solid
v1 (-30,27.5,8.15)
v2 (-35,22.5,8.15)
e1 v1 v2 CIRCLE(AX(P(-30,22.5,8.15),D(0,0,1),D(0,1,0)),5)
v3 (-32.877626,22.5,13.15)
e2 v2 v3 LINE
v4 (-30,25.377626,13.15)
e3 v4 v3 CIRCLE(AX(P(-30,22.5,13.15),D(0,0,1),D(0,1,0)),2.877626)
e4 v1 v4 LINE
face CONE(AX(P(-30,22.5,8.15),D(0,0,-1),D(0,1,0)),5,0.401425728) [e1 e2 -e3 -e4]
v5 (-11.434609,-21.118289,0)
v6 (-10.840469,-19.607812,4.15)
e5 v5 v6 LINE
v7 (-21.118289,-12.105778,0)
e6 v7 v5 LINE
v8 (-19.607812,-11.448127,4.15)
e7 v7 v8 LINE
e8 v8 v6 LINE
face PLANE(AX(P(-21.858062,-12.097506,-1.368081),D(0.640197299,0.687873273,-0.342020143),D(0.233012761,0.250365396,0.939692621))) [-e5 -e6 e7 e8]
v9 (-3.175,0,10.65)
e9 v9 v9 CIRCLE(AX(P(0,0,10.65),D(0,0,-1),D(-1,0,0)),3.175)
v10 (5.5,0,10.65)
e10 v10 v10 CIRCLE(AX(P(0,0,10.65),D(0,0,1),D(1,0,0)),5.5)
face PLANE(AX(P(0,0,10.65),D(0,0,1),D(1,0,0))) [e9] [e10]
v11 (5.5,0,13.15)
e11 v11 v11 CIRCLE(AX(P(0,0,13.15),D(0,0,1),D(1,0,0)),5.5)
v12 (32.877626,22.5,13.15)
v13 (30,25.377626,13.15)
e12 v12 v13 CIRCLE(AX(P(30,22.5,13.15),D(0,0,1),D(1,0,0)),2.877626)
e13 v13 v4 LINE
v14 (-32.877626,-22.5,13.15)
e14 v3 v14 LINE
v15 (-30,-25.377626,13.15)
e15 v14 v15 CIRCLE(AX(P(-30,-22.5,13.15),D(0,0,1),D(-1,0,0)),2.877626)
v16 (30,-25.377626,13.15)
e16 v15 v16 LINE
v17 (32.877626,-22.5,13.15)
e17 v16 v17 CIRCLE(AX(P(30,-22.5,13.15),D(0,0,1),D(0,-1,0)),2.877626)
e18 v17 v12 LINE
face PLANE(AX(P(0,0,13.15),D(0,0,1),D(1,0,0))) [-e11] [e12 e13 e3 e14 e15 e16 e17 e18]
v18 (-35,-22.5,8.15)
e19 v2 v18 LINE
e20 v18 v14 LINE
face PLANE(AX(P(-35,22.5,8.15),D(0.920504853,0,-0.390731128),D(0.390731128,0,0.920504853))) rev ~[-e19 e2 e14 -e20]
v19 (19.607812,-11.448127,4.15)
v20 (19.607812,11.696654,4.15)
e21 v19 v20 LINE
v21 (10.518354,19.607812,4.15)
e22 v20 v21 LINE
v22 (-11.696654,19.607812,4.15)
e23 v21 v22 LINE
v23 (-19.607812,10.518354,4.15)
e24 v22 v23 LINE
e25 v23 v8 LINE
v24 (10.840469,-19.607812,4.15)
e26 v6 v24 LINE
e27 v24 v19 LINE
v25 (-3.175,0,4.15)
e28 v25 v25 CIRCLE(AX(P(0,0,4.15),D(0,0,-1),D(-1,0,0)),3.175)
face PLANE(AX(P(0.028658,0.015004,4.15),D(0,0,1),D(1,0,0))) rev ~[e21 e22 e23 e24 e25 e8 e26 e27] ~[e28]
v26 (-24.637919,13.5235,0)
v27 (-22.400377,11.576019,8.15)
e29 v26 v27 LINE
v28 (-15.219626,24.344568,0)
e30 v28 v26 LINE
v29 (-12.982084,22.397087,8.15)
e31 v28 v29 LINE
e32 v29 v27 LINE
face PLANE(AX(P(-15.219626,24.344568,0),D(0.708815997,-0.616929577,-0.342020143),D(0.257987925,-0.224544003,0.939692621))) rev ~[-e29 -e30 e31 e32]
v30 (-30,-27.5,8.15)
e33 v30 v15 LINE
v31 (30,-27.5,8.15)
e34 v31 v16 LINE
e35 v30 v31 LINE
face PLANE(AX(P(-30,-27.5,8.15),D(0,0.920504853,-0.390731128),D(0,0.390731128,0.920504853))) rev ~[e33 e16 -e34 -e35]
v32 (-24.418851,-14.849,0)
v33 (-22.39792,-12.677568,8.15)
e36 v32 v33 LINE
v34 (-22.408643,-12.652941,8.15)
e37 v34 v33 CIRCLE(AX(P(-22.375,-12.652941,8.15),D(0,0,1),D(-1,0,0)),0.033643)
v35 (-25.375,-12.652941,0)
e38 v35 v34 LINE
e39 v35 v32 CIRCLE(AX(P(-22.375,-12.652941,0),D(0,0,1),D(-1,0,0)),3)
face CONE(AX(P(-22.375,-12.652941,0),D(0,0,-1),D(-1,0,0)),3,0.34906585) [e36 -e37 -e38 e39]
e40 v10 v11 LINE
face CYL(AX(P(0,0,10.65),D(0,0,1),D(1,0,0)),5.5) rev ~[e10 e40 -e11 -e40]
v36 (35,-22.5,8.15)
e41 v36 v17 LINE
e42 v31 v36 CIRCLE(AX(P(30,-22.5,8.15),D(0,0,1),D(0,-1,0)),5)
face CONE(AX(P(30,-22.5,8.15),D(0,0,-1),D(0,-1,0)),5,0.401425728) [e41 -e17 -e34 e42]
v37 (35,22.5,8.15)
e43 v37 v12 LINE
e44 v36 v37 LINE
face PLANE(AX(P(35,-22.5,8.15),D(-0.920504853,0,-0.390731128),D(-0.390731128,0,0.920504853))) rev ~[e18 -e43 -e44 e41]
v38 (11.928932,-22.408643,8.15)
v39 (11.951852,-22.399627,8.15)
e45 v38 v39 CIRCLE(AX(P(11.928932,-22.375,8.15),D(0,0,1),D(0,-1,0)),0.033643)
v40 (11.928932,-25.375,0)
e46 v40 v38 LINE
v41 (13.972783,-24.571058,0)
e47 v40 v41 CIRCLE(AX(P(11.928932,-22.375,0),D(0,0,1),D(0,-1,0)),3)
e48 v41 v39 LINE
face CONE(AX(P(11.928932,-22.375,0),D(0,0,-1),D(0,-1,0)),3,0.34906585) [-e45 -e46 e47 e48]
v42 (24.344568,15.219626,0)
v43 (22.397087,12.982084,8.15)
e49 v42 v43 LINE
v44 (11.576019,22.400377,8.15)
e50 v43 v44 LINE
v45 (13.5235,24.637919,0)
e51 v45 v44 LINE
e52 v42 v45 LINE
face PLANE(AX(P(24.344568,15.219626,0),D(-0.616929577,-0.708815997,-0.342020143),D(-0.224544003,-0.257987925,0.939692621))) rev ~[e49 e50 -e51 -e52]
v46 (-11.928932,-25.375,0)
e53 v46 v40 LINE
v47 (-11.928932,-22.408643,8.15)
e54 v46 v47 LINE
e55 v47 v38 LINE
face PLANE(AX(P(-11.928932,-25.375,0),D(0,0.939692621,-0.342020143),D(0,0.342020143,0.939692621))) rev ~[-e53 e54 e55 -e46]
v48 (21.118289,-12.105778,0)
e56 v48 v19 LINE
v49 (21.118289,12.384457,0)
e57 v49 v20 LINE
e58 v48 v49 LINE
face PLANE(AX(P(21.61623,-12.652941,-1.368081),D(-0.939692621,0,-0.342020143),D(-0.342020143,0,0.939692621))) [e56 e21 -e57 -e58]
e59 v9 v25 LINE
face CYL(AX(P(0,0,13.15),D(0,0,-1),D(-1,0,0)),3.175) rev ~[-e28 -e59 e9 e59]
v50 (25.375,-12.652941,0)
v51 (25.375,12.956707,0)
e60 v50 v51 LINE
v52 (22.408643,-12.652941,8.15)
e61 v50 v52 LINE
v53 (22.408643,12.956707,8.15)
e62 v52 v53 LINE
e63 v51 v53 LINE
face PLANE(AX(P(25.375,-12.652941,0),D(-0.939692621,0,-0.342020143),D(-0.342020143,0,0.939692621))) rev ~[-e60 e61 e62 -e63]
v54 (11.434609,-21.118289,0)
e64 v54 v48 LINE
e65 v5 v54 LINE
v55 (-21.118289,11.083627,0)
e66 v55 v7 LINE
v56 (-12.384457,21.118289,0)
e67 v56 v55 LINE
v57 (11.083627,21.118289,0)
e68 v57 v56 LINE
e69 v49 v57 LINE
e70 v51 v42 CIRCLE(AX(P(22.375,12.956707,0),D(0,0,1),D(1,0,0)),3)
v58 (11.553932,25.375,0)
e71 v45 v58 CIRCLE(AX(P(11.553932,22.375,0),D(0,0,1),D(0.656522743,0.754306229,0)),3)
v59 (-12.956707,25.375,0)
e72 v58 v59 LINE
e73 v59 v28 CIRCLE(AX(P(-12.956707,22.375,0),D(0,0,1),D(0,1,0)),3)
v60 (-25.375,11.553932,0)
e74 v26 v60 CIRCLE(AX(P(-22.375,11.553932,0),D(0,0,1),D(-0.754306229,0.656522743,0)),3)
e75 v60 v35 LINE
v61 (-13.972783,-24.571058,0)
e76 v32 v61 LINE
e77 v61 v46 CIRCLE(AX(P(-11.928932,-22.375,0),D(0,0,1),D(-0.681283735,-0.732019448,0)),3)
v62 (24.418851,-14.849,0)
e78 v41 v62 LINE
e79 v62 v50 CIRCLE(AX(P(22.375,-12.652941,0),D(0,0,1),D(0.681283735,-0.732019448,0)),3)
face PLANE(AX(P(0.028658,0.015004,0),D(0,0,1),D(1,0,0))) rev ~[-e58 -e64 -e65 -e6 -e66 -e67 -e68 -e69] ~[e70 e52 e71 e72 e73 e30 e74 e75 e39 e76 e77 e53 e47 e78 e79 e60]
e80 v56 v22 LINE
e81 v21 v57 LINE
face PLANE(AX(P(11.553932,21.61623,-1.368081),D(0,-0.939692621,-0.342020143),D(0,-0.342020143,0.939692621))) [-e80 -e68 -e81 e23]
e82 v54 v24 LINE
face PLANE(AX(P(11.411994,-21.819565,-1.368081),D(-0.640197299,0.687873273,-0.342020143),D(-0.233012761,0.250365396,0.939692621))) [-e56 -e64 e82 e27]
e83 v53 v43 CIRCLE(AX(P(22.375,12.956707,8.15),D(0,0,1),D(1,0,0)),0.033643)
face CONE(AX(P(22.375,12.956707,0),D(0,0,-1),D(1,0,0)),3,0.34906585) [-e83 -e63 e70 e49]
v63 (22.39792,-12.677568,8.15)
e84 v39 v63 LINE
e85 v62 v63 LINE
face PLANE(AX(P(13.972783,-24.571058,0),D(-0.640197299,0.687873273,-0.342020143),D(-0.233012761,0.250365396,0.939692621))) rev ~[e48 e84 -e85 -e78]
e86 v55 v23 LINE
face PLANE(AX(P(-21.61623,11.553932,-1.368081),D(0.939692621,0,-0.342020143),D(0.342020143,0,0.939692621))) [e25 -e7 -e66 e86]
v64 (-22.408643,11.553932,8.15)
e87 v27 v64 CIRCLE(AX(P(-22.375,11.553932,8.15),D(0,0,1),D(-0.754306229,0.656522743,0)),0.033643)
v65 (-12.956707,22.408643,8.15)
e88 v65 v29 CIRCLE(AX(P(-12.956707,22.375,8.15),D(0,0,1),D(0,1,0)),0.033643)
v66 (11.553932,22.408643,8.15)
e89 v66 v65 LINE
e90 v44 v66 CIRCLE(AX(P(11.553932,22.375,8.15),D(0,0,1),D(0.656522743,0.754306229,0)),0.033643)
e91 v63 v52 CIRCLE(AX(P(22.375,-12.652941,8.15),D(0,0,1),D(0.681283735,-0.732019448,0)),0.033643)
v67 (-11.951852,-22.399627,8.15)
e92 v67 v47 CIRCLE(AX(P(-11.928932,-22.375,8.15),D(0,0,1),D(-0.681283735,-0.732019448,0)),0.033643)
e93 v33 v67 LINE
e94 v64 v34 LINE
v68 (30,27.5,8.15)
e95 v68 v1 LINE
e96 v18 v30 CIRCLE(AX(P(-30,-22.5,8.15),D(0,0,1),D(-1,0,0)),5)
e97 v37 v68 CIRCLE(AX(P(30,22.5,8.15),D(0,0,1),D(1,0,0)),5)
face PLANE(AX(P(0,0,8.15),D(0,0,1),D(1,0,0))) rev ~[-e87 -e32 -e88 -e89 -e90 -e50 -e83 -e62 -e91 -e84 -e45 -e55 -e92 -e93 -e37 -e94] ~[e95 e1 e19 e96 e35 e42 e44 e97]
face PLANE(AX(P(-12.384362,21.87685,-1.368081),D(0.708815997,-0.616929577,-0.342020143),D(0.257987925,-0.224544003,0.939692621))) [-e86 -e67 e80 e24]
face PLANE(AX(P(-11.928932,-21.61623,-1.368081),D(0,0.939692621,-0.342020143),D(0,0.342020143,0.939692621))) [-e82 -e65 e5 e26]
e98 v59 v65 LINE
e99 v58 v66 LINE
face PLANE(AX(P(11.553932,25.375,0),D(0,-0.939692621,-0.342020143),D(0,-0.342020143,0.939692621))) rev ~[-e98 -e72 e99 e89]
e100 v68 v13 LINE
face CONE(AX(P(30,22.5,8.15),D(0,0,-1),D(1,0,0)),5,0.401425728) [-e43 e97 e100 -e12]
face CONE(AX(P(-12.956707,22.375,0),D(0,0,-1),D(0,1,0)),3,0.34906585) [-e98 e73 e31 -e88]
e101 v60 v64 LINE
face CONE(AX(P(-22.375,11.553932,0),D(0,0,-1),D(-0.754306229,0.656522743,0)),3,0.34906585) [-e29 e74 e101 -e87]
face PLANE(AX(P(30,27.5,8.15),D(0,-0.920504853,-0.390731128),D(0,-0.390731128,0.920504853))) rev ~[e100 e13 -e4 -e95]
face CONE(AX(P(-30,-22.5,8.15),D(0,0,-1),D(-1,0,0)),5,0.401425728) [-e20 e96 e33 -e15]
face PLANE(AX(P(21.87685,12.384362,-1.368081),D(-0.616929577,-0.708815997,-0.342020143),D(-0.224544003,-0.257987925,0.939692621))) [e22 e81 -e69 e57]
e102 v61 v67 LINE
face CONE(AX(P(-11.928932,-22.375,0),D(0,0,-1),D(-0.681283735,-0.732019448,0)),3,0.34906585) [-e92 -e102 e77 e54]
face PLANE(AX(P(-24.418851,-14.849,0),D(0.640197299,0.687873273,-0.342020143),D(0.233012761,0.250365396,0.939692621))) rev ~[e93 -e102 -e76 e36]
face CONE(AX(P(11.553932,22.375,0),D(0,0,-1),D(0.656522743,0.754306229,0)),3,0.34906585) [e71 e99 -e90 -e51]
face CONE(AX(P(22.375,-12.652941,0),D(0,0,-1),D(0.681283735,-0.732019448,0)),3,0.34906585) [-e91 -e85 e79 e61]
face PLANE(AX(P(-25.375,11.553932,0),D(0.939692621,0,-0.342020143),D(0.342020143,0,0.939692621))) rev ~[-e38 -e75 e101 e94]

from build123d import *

# Parameters (mm, degrees)
F1_DEPTH       = 8.15
F1_TAPER       = 20
F2_T           = -4
F4_DEPTH       = 5
F4_TAPER       = 23
F6_D           = 6.35
F6_CBORE_D     = 11
F6_CBORE_DEPTH = 2.5


with BuildPart() as f1:
    # F0 (on Top) → F1 (new body)
    with BuildSketch(Plane.XY):
        with BuildLine():
            ThreePointArc((13.5235004185, 24.6379186874), (12.605417789, 25.1846935831), (11.5539321881, 25.375))
            Line((11.5539321881, 25.375), (-12.9567069347, 25.375))
            ThreePointArc((-12.9567069347, 25.375), (-14.1999477217, 25.1052659844), (-15.2196256222, 24.3445682304))
            Line((-15.2196256222, 24.3445682304), (-24.6379186874, 13.5235004185))
            ThreePointArc((-24.6379186874, 13.5235004185), (-25.1846935831, 12.605417789), (-25.375, 11.5539321881))
            Line((-25.375, 11.5539321881), (-25.375, -12.6529412227))
            ThreePointArc((-25.375, -12.6529412227), (-25.1255957189, -13.8505318001), (-24.4188512059, -14.8489995662))
            Line((-24.4188512059, -14.8489995662), (-13.972783394, -24.5710583435))
            ThreePointArc((-13.972783394, -24.5710583435), (-13.0270726549, -25.1667893035), (-11.9289321881, -25.375))
            Line((-11.9289321881, -25.375), (11.9289321881, -25.375))
            ThreePointArc((11.9289321881, -25.375), (13.0270726549, -25.1667893035), (13.972783394, -24.5710583435))
            Line((13.972783394, -24.5710583435), (24.4188512059, -14.8489995662))
            ThreePointArc((24.4188512059, -14.8489995662), (25.1255957189, -13.8505318001), (25.375, -12.6529412227))
            Line((25.375, -12.6529412227), (25.375, 12.9567069347))
            ThreePointArc((25.375, 12.9567069347), (25.1052659844, 14.1999477217), (24.3445682304, 15.2196256222))
            Line((24.3445682304, 15.2196256222), (13.5235004185, 24.6379186874))
        make_face()
    extrude(amount=F1_DEPTH, taper=F1_TAPER)

    # F2
    f2_openings = [f1.faces().sort_by_distance(p)[0] for p in [
        (0.016382, 0.006023, 0),
    ]]
    offset(amount=F2_T, openings=f2_openings)

    # F3 (on face) → F4 (join)
    with BuildSketch(Plane.XY.offset(8.15)):
        with BuildLine():
            ThreePointArc((35, 22.5), (33.5355339059, 26.0355339059), (30, 27.5))
            Line((30, 27.5), (-30, 27.5))
            ThreePointArc((-30, 27.5), (-33.5355339059, 26.0355339059), (-35, 22.5))
            Line((-35, 22.5), (-35, -22.5))
            ThreePointArc((-35, -22.5), (-33.5355339059, -26.0355339059), (-30, -27.5))
            Line((-30, -27.5), (30, -27.5))
            ThreePointArc((30, -27.5), (33.5355339059, -26.0355339059), (35, -22.5))
            Line((35, -22.5), (35, 22.5))
        make_face()
        with BuildLine():
            Line((11.5760193141, 22.4003768158), (22.397087126, 12.9820837505))
            ThreePointArc((22.397087126, 12.9820837505), (22.4056177404, 12.9706488817), (22.4086425907, 12.9567069347))
            Line((22.4086425907, 12.9567069347), (22.4086425907, -12.6529412227))
            ThreePointArc((22.4086425907, -12.6529412227), (22.405845722, -12.6663712392), (22.3979201499, -12.6775682533))
            Line((22.3979201499, -12.6775682533), (11.951852338, -22.3996270307))
            ThreePointArc((11.951852338, -22.3996270307), (11.9412469516, -22.406307675), (11.9289321881, -22.4086425907))
            Line((11.9289321881, -22.4086425907), (-11.9289321881, -22.4086425907))
            ThreePointArc((-11.9289321881, -22.4086425907), (-11.9412469516, -22.406307675), (-11.951852338, -22.3996270307))
            Line((-11.951852338, -22.3996270307), (-22.3979201499, -12.6775682533))
            ThreePointArc((-22.3979201499, -12.6775682533), (-22.405845722, -12.6663712392), (-22.4086425907, -12.6529412227))
            Line((-22.4086425907, -12.6529412227), (-22.4086425907, 11.5539321881))
            ThreePointArc((-22.4086425907, 11.5539321881), (-22.4065084571, 11.5657237547), (-22.4003768158, 11.5760193141))
            Line((-22.4003768158, 11.5760193141), (-12.9820837505, 22.397087126))
            ThreePointArc((-12.9820837505, 22.397087126), (-12.9706488817, 22.4056177404), (-12.9567069347, 22.4086425907))
            Line((-12.9567069347, 22.4086425907), (11.5539321881, 22.4086425907))
            ThreePointArc((11.5539321881, 22.4086425907), (11.5657237547, 22.4065084571), (11.5760193141, 22.4003768158))
        make_face(mode=Mode.SUBTRACT)
        with BuildLine():
            ThreePointArc((22.4086425907, 12.9567069347), (22.4056177404, 12.9706488817), (22.397087126, 12.9820837505))
            Line((22.397087126, 12.9820837505), (11.5760193141, 22.4003768158))
            ThreePointArc((11.5760193141, 22.4003768158), (11.5657237547, 22.4065084571), (11.5539321881, 22.4086425907))
            Line((11.5539321881, 22.4086425907), (-12.9567069347, 22.4086425907))
            ThreePointArc((-12.9567069347, 22.4086425907), (-12.9706488817, 22.4056177404), (-12.9820837505, 22.397087126))
            Line((-12.9820837505, 22.397087126), (-22.4003768158, 11.5760193141))
            ThreePointArc((-22.4003768158, 11.5760193141), (-22.4065084571, 11.5657237547), (-22.4086425907, 11.5539321881))
            Line((-22.4086425907, 11.5539321881), (-22.4086425907, -12.6529412227))
            ThreePointArc((-22.4086425907, -12.6529412227), (-22.405845722, -12.6663712392), (-22.3979201499, -12.6775682533))
            Line((-22.3979201499, -12.6775682533), (-11.951852338, -22.3996270307))
            ThreePointArc((-11.951852338, -22.3996270307), (-11.9412469516, -22.406307675), (-11.9289321881, -22.4086425907))
            Line((-11.9289321881, -22.4086425907), (11.9289321881, -22.4086425907))
            ThreePointArc((11.9289321881, -22.4086425907), (11.9412469516, -22.406307675), (11.951852338, -22.3996270307))
            Line((11.951852338, -22.3996270307), (22.3979201499, -12.6775682533))
            ThreePointArc((22.3979201499, -12.6775682533), (22.405845722, -12.6663712392), (22.4086425907, -12.6529412227))
            Line((22.4086425907, -12.6529412227), (22.4086425907, 12.9567069347))
        make_face()
    extrude(amount=F4_DEPTH, taper=F4_TAPER)

    # F6 (through all)
    with Locations(Plane.XY.offset(13.15)):
        with Locations((0, 0)):
            CounterBoreHole(F6_D / 2, F6_CBORE_D / 2, F6_CBORE_DEPTH)


solid = f1.part
